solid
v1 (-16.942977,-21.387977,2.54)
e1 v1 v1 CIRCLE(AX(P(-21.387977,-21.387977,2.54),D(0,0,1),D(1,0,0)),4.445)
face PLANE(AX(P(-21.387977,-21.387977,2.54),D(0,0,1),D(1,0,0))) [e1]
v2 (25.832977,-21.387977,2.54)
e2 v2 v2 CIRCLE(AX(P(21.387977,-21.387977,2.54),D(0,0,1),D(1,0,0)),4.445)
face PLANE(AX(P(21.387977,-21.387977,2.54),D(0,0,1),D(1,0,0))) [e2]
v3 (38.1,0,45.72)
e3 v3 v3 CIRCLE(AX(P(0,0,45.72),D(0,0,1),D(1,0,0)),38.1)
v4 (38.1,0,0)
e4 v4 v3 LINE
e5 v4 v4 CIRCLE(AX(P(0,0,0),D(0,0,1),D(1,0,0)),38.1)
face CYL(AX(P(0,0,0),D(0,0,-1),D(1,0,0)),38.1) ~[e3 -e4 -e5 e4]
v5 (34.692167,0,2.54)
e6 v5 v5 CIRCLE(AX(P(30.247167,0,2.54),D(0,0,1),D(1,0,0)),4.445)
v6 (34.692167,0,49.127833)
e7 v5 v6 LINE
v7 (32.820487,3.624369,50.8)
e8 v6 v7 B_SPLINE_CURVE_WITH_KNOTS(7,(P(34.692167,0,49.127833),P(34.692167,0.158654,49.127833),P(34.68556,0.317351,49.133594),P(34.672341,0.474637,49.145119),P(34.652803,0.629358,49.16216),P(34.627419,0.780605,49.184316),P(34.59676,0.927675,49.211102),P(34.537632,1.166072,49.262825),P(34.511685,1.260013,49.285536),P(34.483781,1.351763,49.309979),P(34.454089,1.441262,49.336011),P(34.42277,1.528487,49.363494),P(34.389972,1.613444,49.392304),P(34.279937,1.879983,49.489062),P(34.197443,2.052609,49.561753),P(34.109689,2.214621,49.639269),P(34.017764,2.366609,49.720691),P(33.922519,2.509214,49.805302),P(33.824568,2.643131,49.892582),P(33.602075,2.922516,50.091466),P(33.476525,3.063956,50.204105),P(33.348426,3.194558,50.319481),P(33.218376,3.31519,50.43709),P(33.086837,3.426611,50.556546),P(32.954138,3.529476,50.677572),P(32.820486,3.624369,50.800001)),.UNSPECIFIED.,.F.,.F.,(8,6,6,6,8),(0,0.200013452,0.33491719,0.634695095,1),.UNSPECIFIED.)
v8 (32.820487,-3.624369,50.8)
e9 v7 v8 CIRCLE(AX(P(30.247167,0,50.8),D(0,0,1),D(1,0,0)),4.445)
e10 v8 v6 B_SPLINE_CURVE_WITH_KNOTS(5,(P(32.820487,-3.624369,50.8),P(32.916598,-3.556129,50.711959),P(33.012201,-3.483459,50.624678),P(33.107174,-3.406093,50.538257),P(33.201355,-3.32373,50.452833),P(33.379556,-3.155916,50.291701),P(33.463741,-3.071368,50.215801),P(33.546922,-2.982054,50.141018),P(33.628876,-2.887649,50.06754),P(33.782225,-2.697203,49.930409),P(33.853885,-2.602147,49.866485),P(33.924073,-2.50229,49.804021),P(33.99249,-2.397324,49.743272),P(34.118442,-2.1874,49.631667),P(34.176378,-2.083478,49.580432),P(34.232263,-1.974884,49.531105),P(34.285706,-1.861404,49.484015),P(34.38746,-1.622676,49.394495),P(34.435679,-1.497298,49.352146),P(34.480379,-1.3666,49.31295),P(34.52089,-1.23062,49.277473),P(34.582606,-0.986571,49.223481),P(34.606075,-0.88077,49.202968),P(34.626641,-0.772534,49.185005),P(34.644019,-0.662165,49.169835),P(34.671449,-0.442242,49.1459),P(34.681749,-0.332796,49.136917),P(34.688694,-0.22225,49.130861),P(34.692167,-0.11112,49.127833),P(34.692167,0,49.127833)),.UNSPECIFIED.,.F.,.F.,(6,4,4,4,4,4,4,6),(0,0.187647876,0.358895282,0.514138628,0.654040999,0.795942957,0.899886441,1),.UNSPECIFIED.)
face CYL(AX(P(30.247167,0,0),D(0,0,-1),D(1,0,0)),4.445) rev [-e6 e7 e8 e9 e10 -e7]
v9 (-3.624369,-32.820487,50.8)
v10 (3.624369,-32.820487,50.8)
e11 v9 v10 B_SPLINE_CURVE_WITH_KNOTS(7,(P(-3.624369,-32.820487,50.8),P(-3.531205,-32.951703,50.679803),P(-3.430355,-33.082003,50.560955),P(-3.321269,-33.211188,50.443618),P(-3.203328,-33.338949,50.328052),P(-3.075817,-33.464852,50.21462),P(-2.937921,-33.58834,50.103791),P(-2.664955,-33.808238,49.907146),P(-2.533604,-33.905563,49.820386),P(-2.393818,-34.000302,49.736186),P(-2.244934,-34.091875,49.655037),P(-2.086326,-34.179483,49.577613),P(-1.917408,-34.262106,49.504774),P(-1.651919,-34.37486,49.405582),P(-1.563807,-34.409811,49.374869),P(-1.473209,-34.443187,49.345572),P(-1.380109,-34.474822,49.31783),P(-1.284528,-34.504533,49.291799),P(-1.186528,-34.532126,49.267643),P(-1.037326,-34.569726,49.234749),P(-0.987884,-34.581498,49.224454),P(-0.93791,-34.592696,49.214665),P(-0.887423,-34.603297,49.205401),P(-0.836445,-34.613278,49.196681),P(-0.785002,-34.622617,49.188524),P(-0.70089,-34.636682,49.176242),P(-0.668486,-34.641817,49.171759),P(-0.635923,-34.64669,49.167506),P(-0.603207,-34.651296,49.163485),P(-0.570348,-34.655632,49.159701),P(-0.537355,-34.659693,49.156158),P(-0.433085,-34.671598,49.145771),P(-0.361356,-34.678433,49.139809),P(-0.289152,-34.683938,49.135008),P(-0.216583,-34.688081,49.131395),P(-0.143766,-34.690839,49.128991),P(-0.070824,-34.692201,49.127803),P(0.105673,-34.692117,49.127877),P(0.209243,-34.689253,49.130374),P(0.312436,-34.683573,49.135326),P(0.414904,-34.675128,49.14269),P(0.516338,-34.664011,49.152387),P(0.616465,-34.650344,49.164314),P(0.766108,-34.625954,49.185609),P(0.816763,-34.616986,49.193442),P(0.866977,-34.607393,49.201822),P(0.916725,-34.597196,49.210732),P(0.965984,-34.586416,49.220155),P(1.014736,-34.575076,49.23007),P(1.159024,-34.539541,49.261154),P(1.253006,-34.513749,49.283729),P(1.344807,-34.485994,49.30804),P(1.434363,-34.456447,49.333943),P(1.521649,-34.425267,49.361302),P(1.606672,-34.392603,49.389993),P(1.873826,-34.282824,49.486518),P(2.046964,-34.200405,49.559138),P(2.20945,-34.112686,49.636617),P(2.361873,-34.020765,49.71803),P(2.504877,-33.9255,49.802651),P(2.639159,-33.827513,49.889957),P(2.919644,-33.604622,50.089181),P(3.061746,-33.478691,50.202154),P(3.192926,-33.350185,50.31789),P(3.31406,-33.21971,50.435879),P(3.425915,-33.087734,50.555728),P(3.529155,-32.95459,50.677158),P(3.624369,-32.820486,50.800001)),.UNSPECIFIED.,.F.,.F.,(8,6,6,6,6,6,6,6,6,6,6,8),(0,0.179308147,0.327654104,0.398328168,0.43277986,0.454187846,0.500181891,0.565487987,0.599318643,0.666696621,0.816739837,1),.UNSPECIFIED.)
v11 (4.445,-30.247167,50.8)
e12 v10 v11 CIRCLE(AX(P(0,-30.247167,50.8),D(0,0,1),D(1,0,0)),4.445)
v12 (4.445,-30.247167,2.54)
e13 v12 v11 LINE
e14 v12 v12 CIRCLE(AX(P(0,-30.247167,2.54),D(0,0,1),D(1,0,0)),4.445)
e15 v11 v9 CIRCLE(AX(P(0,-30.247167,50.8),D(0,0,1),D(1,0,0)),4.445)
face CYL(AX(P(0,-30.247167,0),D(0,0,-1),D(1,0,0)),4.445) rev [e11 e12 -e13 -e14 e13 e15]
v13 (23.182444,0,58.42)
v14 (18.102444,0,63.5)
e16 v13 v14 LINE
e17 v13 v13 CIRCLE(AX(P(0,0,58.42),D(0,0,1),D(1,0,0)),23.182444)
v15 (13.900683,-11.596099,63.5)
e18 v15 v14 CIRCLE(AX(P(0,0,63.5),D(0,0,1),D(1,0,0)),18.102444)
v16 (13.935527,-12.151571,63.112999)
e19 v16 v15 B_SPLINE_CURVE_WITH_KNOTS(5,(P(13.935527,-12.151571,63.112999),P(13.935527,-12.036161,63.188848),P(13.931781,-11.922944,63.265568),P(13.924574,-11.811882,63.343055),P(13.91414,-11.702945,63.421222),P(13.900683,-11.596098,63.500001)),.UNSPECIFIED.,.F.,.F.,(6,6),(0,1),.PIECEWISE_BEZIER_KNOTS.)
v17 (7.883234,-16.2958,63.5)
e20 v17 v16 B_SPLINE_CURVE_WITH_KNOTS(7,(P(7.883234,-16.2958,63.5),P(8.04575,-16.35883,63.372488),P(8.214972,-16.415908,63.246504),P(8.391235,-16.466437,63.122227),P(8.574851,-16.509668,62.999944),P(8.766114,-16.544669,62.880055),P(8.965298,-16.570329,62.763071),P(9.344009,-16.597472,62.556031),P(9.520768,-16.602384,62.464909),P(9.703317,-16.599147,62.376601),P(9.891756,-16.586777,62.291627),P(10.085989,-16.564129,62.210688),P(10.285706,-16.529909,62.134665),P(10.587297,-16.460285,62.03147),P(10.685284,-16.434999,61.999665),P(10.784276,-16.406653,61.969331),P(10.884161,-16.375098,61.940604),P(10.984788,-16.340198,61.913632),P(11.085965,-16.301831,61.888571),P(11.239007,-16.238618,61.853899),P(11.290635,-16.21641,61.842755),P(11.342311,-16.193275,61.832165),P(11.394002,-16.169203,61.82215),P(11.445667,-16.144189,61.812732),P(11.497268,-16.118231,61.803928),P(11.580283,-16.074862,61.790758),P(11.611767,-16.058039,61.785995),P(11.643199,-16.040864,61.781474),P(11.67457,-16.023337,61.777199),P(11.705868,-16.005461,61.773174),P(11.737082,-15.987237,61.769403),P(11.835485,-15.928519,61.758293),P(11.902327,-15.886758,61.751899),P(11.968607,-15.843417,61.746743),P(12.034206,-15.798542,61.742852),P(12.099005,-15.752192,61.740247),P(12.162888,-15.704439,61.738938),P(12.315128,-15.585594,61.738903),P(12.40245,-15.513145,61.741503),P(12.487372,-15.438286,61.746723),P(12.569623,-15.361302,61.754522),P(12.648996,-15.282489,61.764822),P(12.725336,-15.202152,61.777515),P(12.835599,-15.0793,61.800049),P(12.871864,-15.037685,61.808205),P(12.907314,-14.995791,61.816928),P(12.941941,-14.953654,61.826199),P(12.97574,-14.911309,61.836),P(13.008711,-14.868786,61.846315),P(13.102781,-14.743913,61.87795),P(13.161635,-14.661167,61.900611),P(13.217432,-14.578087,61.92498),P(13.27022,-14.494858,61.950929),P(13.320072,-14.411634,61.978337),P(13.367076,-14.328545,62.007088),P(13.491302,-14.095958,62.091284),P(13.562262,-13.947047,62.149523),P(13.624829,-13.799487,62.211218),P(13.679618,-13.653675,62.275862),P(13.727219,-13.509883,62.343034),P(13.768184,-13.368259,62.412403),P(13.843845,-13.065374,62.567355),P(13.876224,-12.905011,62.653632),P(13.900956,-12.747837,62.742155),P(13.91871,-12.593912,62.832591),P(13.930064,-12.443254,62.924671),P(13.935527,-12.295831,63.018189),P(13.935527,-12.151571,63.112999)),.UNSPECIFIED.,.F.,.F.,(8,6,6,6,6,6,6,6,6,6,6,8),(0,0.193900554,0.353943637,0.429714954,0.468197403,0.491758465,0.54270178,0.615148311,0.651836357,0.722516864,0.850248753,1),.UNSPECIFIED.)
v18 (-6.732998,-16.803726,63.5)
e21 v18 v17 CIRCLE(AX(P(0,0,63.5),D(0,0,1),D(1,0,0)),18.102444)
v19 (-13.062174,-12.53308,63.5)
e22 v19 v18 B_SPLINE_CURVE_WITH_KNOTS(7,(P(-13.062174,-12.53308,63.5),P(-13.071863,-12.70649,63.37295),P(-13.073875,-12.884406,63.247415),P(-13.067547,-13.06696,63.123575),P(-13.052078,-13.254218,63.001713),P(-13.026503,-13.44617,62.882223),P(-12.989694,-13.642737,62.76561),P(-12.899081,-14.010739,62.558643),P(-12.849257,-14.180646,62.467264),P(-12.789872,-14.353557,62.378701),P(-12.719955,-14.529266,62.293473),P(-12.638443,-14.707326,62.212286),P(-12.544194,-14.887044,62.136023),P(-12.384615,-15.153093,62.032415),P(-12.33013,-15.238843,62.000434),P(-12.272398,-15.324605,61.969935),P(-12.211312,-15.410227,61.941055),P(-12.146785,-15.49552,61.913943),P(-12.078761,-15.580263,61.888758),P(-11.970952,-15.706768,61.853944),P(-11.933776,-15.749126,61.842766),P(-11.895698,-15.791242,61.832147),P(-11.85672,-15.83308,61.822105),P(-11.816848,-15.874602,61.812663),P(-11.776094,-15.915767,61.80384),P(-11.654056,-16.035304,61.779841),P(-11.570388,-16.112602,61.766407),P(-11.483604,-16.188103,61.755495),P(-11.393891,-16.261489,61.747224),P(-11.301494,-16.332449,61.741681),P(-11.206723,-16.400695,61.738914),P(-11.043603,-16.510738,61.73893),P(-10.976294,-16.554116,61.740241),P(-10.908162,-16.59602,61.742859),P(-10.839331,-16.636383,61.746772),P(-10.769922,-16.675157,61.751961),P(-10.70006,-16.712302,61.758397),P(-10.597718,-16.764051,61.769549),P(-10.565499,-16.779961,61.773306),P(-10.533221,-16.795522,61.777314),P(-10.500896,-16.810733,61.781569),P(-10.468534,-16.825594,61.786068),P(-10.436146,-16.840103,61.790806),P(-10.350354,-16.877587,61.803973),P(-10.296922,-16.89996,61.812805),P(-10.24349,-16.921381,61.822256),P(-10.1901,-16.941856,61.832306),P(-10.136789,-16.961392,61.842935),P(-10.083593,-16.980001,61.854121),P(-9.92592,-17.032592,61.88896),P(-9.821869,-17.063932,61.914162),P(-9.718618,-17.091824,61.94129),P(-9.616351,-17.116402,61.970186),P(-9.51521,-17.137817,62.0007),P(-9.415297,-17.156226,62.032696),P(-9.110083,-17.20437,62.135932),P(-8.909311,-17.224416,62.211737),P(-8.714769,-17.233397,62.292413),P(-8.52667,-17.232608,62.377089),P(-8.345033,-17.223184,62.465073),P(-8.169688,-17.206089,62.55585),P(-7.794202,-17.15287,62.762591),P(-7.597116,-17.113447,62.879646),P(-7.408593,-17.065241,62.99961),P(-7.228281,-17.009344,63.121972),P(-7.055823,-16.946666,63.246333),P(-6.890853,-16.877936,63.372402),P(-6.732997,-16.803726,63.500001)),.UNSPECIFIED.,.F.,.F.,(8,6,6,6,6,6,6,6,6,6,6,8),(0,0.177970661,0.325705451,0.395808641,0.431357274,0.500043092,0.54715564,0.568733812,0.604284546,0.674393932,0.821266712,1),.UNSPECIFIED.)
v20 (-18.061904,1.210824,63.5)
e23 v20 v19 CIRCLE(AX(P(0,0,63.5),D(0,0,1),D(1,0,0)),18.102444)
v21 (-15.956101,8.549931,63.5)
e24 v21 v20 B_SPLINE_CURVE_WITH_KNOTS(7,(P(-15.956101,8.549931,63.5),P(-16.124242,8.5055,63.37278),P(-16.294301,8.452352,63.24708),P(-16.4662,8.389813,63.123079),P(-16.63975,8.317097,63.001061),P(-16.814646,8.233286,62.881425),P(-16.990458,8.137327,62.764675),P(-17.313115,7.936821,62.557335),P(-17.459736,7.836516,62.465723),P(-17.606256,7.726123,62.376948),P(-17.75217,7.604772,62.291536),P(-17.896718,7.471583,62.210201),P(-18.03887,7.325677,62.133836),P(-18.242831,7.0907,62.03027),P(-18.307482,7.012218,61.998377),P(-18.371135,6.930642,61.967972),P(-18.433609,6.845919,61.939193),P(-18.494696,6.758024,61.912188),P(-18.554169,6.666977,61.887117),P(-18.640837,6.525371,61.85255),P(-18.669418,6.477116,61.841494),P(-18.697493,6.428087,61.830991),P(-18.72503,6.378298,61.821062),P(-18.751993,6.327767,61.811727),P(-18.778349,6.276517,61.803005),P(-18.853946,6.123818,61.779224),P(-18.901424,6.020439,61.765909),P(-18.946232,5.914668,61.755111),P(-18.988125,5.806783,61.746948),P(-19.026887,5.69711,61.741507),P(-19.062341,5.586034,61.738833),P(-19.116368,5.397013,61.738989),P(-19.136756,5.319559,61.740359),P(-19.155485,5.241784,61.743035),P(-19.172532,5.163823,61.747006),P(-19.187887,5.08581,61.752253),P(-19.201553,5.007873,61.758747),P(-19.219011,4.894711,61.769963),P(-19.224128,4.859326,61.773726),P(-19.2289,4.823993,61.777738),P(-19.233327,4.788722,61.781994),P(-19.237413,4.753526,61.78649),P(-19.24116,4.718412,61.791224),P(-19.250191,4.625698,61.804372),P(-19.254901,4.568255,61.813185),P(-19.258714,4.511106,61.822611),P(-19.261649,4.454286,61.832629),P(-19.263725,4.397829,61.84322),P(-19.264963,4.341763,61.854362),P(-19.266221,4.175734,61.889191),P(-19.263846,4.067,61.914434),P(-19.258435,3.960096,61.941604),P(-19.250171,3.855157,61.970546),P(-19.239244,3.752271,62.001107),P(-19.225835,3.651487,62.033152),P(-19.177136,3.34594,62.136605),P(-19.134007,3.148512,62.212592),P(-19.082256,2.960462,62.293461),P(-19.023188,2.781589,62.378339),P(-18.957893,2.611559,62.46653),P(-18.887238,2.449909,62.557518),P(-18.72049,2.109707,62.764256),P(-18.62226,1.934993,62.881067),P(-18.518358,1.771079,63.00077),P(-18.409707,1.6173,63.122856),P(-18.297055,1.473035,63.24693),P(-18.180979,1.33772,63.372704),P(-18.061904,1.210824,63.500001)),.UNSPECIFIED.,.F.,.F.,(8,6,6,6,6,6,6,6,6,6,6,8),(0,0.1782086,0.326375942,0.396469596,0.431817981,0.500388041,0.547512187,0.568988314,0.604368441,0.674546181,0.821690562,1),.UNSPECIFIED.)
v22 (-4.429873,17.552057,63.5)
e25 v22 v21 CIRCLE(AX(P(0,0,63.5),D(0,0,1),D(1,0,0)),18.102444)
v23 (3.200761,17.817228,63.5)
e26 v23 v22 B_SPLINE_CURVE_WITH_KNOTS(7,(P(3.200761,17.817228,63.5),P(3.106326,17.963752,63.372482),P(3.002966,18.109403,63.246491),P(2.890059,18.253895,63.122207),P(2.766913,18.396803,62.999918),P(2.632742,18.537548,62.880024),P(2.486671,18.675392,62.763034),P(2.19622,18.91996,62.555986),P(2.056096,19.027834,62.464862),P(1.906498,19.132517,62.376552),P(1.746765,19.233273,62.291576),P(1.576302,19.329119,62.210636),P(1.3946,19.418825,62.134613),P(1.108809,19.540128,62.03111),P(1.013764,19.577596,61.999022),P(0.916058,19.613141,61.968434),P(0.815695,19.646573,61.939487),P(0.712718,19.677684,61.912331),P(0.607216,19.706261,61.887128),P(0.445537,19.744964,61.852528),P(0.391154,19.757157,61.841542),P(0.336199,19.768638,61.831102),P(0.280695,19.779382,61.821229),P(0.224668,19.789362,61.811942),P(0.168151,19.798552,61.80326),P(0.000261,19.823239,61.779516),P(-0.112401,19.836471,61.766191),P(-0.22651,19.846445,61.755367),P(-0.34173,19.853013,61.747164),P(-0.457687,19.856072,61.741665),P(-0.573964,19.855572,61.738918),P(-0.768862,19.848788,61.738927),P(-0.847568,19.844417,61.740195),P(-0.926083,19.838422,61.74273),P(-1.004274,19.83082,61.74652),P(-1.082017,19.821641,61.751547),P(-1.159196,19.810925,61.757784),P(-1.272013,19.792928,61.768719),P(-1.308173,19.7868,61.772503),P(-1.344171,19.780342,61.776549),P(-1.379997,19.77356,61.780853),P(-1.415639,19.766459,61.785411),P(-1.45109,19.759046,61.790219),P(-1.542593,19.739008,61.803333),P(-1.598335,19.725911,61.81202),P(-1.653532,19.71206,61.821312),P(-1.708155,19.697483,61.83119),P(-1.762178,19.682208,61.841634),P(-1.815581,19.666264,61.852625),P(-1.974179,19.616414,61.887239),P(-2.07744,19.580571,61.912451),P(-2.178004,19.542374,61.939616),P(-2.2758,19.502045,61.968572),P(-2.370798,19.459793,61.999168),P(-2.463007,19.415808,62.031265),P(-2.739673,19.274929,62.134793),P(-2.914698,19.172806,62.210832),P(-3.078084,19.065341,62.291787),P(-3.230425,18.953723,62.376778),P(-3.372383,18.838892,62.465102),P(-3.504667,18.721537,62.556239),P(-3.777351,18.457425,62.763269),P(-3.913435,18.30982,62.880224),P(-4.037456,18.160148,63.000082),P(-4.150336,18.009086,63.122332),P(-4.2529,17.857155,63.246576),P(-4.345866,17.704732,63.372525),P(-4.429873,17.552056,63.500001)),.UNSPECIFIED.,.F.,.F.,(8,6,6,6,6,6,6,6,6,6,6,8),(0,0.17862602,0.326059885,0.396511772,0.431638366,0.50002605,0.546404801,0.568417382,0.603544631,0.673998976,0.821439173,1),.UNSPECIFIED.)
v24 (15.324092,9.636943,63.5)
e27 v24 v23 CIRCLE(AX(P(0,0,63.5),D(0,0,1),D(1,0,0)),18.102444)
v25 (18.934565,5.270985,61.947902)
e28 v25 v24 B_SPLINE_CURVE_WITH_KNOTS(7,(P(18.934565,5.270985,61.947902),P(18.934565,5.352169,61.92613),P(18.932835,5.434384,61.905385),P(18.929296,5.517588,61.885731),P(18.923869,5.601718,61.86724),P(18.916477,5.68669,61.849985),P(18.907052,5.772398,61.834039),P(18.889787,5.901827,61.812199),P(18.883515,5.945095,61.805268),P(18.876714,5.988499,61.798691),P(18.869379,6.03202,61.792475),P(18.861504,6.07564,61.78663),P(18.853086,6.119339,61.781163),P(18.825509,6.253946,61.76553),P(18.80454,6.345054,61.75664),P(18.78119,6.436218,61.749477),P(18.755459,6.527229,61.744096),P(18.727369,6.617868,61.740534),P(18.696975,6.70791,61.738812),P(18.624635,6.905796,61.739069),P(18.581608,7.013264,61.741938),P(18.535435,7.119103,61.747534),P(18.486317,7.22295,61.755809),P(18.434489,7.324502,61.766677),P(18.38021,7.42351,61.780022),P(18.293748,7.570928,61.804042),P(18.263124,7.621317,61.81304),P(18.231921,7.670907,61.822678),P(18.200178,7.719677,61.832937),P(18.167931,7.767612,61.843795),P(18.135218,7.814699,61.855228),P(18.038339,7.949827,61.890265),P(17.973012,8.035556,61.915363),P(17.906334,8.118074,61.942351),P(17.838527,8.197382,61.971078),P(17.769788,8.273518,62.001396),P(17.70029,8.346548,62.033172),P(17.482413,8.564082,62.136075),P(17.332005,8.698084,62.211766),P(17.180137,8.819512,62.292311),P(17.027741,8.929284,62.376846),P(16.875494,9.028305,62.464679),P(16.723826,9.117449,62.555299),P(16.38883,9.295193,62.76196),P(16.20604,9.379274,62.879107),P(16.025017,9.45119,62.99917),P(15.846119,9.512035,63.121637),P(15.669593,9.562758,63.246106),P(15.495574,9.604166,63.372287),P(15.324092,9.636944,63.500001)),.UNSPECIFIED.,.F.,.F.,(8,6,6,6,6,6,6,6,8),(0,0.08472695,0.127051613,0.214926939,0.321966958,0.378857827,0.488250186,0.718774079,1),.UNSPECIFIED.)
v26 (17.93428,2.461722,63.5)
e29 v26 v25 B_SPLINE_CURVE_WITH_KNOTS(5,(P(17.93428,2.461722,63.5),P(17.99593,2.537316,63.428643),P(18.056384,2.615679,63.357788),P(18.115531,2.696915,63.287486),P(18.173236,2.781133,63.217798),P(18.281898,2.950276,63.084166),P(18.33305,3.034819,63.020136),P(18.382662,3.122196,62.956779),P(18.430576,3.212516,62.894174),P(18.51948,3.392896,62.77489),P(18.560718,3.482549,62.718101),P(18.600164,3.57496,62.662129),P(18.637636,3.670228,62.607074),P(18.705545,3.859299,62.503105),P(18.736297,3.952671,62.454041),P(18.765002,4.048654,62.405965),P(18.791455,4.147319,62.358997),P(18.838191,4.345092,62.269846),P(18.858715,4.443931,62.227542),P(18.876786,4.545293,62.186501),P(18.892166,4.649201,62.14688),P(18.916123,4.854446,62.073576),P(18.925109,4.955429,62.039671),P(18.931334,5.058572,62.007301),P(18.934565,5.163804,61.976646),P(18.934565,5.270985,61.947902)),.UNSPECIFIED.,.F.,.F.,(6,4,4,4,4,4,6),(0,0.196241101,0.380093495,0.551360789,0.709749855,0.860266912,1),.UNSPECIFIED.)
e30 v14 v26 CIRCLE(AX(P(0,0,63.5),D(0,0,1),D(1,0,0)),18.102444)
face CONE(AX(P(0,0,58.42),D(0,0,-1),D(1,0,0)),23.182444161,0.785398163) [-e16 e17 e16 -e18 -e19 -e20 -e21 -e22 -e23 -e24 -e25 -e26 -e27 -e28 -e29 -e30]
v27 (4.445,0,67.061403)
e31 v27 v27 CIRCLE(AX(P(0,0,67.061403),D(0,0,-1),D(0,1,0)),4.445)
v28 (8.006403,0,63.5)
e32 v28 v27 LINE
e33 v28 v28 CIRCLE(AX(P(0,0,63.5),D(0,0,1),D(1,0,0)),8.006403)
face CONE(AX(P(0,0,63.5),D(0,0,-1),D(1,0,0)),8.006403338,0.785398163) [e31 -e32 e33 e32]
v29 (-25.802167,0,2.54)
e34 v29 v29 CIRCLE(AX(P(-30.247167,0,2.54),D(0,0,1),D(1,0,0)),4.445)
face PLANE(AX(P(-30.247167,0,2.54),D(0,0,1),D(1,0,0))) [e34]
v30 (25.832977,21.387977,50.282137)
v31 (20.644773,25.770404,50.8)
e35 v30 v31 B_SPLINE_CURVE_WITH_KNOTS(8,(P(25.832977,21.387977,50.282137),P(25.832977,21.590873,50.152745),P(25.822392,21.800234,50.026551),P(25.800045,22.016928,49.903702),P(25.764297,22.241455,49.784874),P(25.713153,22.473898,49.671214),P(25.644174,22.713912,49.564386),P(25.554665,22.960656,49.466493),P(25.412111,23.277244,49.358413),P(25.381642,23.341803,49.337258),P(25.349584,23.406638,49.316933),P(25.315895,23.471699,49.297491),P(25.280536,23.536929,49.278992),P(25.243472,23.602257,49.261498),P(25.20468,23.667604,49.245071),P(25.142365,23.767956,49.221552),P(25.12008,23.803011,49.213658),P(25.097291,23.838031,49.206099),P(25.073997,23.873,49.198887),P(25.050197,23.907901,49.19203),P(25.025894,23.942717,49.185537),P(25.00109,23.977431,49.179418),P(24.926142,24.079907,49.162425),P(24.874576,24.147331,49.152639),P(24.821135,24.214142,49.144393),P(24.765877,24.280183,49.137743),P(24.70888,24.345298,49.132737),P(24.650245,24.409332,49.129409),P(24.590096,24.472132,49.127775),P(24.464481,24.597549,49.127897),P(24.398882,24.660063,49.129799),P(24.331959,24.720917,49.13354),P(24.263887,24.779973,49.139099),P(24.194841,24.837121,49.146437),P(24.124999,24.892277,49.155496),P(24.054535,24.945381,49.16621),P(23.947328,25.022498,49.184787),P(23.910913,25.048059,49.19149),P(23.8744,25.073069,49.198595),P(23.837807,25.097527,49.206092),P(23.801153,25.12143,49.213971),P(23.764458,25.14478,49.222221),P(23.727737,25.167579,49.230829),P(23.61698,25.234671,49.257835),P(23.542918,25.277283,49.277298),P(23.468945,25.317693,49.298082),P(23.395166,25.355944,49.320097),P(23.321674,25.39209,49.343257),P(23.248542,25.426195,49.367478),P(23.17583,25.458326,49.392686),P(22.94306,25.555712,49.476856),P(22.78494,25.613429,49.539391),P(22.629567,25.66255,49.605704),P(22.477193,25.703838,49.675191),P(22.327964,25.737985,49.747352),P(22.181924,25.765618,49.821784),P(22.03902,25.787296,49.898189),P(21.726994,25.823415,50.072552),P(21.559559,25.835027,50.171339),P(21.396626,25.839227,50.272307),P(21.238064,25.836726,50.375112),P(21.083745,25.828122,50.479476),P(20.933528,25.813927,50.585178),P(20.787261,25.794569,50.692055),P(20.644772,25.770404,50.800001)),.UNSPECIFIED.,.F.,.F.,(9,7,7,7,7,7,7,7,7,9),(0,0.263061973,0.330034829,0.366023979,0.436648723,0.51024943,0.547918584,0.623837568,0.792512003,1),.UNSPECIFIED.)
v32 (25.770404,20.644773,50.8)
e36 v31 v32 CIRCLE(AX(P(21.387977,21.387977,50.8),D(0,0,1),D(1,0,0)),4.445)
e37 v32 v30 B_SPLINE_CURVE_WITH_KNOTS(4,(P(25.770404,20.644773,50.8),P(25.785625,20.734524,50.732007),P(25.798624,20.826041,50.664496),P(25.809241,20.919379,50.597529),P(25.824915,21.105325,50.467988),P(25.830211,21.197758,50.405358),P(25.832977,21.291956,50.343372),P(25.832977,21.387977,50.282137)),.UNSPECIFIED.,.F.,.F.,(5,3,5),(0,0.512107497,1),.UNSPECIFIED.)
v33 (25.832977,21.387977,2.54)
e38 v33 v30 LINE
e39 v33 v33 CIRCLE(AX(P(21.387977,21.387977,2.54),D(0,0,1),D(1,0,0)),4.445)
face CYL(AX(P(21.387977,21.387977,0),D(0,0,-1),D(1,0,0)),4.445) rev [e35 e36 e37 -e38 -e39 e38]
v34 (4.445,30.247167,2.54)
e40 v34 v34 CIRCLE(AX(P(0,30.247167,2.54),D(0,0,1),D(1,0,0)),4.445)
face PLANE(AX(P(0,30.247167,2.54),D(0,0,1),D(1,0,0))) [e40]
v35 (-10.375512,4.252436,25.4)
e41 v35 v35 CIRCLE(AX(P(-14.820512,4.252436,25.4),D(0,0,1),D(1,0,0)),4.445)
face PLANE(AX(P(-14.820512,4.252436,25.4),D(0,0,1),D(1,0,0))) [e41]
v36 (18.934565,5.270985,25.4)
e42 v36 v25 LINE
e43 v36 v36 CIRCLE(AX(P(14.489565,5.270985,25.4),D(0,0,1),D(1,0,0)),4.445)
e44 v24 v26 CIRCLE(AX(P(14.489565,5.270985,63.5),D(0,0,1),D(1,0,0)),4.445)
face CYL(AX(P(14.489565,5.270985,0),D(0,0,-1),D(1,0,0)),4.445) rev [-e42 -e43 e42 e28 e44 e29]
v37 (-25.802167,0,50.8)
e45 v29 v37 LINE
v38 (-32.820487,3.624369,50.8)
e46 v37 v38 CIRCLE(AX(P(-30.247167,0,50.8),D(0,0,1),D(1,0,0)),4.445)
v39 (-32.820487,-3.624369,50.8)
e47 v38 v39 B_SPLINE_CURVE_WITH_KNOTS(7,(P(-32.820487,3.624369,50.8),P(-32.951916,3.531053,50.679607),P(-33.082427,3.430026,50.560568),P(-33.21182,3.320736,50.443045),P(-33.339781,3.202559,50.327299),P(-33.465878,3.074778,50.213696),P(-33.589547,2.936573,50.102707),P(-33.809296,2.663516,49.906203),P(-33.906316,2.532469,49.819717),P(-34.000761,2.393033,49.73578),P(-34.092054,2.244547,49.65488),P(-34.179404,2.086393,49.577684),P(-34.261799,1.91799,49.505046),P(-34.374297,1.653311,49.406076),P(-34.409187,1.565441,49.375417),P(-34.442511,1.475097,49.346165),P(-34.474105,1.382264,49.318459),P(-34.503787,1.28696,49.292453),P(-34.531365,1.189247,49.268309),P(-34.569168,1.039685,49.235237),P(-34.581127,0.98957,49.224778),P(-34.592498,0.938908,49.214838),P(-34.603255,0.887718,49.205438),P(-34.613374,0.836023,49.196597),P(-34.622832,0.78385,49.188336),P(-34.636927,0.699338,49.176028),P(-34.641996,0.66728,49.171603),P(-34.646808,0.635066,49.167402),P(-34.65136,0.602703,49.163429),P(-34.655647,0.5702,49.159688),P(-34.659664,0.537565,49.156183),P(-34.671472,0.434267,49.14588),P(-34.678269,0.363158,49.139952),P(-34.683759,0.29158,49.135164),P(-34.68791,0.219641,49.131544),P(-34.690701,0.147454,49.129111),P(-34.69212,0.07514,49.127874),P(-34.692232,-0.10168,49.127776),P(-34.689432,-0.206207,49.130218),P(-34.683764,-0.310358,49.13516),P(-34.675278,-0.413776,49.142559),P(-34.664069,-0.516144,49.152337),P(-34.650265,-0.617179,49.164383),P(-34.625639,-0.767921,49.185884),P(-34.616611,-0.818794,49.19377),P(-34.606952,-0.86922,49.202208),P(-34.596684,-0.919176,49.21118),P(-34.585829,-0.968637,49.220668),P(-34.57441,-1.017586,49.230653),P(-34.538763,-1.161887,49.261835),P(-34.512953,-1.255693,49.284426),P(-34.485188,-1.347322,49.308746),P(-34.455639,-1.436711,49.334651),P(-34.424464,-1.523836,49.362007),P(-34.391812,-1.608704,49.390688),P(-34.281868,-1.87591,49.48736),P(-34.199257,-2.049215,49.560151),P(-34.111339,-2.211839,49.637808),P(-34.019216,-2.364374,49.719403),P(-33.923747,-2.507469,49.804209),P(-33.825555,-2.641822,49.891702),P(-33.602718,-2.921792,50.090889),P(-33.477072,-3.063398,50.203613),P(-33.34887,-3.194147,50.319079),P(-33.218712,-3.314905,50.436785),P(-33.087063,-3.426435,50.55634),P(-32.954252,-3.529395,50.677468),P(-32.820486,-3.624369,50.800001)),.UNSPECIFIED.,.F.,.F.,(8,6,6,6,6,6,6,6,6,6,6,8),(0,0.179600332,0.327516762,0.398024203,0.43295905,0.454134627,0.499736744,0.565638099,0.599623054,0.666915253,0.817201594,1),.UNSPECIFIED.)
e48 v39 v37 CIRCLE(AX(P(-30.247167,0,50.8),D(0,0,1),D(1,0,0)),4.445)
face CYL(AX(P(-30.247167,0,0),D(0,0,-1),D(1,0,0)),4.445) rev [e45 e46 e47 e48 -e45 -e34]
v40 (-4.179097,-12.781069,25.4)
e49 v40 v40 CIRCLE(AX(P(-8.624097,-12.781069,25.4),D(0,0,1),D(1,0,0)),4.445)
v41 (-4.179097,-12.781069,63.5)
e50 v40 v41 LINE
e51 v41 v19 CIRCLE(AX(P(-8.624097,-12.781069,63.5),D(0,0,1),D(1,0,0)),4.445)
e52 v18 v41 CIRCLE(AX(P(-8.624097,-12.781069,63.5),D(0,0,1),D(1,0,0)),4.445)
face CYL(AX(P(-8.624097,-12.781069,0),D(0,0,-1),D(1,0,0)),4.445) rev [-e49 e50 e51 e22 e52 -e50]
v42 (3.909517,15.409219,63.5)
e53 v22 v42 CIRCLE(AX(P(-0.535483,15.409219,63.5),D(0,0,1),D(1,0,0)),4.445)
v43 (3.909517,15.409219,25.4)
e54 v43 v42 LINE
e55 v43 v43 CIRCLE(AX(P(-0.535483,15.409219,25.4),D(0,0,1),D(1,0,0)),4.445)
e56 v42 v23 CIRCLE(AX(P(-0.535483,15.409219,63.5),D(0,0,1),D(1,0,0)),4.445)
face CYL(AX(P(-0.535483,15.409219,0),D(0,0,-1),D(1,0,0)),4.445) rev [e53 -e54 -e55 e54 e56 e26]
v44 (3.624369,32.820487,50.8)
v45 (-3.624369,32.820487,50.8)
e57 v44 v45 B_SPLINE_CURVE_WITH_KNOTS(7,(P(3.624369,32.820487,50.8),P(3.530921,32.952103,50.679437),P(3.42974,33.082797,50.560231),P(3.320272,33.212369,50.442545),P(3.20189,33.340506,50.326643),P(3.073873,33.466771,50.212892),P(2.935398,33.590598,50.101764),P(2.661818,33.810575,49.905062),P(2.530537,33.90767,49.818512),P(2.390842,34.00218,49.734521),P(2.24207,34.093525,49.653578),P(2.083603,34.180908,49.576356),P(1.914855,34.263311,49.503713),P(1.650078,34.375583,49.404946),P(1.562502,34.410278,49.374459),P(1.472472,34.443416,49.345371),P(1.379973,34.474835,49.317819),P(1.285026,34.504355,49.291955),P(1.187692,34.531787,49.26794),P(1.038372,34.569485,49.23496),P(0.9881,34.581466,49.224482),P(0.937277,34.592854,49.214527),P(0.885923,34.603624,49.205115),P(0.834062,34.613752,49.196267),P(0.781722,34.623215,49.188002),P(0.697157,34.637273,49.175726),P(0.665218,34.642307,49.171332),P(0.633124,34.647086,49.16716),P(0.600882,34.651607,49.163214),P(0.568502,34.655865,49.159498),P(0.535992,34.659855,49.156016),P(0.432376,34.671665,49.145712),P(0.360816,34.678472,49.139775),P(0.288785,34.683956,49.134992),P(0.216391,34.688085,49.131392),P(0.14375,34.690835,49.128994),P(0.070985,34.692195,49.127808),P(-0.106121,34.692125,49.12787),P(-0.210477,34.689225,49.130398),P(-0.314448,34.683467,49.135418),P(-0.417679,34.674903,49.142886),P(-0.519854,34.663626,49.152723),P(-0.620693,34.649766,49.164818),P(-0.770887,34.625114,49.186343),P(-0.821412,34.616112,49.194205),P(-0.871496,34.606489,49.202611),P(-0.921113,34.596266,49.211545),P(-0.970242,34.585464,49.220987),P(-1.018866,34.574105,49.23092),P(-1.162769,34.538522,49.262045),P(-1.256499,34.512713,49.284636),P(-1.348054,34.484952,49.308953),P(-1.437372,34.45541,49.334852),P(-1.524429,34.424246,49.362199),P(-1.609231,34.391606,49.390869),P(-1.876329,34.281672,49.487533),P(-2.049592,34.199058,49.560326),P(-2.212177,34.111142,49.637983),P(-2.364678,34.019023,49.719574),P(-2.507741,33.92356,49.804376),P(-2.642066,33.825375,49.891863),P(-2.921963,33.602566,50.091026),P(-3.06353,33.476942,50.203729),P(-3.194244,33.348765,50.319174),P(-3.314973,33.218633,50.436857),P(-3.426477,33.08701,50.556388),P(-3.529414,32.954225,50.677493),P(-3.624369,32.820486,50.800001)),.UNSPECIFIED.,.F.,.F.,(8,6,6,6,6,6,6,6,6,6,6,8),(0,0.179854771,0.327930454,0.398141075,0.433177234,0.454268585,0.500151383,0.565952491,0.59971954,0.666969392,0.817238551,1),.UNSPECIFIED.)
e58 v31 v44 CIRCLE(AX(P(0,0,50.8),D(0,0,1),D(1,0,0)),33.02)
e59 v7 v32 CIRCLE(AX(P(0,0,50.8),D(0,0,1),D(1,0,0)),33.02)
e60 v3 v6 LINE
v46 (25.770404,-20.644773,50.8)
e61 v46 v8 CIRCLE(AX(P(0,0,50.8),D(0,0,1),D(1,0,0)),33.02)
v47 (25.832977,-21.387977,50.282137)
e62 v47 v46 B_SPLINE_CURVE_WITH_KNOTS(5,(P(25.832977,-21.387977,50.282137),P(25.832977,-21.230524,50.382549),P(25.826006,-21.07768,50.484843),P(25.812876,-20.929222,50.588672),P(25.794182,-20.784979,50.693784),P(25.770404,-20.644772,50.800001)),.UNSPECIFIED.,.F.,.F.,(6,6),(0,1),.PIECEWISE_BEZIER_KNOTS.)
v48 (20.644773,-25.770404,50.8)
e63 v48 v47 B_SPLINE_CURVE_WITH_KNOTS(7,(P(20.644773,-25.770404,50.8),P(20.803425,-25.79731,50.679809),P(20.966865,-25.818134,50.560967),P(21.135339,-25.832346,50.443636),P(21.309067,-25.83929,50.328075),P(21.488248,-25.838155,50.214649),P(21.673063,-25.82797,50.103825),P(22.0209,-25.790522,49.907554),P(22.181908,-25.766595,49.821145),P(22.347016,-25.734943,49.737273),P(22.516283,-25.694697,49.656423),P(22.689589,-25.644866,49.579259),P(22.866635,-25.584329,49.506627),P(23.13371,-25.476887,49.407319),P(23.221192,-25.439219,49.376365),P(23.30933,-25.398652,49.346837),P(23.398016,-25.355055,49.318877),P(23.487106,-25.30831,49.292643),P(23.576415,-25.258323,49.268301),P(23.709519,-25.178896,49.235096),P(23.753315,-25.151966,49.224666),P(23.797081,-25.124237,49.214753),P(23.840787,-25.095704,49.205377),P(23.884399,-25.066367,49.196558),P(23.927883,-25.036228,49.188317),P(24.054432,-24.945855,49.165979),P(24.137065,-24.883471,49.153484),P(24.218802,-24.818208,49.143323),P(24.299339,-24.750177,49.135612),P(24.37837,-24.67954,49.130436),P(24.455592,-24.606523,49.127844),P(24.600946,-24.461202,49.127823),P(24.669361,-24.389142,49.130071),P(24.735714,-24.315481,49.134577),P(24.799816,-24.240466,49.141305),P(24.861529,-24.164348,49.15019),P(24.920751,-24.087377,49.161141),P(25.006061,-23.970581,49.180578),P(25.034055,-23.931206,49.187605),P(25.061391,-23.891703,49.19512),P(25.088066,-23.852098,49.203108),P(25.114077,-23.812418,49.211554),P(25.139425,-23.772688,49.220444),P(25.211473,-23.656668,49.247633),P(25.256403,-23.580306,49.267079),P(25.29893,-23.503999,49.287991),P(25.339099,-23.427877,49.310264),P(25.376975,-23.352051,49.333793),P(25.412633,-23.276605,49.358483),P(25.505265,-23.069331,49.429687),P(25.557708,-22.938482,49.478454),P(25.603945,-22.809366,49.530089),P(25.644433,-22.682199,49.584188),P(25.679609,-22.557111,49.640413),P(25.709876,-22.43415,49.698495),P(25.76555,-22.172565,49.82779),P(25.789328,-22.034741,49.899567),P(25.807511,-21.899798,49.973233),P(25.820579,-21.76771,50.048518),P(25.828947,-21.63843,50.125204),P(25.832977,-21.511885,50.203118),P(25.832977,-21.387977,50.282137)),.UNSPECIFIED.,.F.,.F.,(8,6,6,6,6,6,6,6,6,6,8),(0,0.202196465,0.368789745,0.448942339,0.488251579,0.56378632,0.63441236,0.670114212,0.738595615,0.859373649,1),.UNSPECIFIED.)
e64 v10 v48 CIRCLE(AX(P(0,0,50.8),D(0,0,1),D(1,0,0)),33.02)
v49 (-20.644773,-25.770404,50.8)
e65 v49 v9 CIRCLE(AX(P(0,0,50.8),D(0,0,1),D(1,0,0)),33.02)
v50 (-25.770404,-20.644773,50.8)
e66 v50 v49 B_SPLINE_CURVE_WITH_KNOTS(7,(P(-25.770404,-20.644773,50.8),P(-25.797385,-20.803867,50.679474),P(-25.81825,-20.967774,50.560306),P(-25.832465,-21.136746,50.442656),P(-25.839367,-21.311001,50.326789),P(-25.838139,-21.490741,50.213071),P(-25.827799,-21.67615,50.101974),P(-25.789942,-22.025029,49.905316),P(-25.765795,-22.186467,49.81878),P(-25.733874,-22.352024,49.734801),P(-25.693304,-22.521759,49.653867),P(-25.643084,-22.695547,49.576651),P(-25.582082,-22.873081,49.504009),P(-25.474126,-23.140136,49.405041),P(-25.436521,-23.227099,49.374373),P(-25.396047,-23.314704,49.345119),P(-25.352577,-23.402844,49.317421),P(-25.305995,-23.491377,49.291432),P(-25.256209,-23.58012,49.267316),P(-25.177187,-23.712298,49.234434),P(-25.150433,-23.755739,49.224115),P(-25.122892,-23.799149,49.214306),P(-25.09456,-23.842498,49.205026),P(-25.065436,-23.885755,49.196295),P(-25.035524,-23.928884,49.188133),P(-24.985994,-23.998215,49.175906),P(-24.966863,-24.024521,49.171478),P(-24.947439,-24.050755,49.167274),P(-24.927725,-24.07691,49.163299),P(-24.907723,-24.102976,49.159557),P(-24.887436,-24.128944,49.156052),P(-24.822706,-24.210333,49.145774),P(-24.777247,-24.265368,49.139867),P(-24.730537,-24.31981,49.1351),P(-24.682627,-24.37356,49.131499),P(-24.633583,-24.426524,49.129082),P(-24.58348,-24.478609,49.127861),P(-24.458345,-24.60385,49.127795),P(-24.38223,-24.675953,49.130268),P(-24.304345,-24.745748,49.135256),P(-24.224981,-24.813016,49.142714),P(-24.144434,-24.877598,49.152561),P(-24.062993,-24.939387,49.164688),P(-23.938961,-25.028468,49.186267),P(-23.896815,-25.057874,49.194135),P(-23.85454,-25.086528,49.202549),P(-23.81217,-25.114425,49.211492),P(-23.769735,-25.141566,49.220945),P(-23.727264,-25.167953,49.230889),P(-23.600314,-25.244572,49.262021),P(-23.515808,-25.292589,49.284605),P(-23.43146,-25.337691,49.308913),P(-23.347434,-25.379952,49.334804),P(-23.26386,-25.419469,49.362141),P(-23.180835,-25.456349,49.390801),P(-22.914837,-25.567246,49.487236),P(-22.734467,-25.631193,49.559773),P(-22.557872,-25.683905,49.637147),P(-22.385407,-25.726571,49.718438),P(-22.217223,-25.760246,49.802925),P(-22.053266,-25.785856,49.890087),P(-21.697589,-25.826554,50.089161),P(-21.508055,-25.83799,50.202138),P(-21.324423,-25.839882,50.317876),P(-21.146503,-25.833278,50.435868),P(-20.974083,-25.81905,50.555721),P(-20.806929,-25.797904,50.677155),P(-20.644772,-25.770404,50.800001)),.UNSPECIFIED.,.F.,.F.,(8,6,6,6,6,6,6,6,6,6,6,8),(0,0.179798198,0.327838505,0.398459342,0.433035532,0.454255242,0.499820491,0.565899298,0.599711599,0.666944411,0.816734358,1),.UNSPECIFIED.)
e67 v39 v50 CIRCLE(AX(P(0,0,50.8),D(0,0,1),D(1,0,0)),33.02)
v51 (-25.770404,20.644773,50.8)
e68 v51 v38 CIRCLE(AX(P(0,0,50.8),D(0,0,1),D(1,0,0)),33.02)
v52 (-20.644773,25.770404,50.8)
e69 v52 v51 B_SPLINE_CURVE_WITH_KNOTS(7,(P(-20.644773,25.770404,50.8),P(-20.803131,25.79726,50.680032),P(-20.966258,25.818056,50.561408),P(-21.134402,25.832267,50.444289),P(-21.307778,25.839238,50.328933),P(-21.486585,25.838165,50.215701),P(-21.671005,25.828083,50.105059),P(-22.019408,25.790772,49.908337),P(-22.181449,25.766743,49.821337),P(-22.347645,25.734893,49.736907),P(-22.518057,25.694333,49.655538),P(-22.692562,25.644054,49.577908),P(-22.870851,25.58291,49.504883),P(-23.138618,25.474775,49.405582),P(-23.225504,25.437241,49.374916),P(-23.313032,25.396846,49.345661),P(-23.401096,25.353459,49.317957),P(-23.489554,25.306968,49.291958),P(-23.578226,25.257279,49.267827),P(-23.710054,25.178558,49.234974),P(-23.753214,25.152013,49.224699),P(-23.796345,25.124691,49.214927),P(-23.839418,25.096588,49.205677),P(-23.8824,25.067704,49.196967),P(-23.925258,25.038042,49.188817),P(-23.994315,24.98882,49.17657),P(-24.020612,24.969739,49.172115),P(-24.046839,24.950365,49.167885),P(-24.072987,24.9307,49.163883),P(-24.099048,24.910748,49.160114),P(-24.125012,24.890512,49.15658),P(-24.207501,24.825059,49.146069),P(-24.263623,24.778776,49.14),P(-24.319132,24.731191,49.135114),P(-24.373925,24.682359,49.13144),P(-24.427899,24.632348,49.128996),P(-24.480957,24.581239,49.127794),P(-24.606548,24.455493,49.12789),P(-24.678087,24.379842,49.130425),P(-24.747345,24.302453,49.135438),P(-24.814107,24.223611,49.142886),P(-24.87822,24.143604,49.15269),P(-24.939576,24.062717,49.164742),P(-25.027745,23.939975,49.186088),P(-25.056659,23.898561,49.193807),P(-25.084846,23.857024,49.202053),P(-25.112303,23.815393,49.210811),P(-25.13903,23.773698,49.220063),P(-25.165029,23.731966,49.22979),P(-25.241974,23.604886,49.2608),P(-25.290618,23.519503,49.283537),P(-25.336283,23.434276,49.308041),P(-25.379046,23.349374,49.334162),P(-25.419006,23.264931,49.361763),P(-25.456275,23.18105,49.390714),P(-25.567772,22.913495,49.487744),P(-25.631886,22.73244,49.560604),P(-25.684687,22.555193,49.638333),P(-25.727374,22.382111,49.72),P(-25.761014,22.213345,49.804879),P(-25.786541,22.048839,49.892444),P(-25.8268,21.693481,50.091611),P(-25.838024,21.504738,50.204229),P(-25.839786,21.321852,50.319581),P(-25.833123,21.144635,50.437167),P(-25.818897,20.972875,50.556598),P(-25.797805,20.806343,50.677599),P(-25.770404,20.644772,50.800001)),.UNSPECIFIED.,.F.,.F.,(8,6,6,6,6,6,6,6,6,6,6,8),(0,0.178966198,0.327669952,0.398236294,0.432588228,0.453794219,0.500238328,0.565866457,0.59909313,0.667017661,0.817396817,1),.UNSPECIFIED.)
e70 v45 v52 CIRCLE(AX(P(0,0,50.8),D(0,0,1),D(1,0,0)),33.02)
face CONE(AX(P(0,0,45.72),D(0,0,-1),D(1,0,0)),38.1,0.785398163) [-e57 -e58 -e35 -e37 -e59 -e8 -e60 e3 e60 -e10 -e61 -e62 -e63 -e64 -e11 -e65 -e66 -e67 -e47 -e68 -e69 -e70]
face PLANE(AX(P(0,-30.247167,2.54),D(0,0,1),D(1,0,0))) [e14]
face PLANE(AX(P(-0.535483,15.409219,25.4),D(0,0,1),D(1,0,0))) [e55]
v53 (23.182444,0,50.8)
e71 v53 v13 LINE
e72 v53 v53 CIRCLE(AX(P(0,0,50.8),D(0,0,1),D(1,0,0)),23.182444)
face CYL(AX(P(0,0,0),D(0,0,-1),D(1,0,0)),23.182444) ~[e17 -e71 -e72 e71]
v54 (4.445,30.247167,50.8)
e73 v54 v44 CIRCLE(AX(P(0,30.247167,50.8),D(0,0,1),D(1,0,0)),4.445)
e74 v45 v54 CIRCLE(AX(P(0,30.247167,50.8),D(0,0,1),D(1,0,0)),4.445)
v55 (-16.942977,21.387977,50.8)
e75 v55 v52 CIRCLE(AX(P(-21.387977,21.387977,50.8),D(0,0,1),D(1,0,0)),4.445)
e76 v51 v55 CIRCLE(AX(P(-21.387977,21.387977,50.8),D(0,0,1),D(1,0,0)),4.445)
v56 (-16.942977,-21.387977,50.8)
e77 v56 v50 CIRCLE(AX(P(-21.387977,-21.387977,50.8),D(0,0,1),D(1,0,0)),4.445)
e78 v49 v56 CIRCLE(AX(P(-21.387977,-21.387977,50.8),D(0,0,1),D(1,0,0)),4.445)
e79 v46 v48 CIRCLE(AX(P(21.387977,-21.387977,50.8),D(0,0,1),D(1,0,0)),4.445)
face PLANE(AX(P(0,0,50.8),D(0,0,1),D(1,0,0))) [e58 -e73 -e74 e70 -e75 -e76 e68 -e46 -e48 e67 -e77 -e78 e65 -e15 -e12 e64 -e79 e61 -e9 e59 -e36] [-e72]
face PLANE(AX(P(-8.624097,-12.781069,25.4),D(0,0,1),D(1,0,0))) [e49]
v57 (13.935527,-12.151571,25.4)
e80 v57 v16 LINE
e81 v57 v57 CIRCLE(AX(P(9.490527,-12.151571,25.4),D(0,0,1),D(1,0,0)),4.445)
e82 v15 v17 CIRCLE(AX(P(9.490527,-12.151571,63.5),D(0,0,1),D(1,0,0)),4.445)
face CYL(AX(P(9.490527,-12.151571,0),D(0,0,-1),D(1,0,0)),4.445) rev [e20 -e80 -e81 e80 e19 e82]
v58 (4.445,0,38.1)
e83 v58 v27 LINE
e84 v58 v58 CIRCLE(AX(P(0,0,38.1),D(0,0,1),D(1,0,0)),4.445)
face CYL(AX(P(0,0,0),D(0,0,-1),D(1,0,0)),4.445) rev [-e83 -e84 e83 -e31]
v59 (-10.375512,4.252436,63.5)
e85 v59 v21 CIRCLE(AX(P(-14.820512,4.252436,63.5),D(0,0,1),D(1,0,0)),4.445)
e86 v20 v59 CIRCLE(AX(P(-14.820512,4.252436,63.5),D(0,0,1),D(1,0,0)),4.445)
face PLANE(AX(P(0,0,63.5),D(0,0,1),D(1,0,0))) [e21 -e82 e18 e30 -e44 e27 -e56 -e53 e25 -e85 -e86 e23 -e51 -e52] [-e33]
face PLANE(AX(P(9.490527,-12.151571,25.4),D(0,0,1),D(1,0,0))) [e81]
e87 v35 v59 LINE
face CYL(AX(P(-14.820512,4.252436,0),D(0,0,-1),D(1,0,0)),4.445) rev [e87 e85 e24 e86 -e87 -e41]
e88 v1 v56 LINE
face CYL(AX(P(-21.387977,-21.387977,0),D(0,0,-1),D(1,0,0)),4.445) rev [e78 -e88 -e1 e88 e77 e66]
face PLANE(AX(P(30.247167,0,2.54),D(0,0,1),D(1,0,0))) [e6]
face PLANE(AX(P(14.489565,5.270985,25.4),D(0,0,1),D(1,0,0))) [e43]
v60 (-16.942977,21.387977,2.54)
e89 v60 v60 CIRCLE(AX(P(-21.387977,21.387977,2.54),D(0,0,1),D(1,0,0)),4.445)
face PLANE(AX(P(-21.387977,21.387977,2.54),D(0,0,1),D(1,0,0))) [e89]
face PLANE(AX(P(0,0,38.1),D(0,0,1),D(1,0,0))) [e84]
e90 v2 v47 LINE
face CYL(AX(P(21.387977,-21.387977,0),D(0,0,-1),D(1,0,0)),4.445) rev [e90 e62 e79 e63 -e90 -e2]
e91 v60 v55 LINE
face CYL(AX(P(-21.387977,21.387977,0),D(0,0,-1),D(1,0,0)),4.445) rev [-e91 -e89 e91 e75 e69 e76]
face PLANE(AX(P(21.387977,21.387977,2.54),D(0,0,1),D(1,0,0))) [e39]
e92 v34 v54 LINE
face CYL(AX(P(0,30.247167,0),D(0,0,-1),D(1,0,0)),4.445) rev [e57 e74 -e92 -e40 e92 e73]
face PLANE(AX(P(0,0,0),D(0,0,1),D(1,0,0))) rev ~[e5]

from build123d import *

# Parameters (mm, degrees)
F0_R     = 38.1
F0_R_2   = 4.445
F0_R_3   = 23.1824441608
F1_DEPTH = 50.8
F0_R_4   = 8.0064033383
F2_DEPTH = 63.5
F3_DEPTH = 68.58
F4_DEPTH = 2.54
F5_DEPTH = 25.4
F6_DEPTH = 38.1


# Not quite as in the source:
# - a fillet or chamfer that OpenCascade refuses, or shapes differently, is made with other operations: its cross-section is extruded or revolved along the edge and cut away or added


with BuildPart() as f1:
    # F0 (on Top) → F1 (new body)
    with BuildSketch(Plane.XY):
        Circle(F0_R)
        with Locations((-21.3879767226, -21.3879767226)):
            Circle(F0_R_2, mode=Mode.SUBTRACT)
        with Locations((0, -30.2471667528)):
            Circle(F0_R_2, mode=Mode.SUBTRACT)
        with Locations((21.3879767226, -21.3879767226)):
            Circle(F0_R_2, mode=Mode.SUBTRACT)
        with Locations((-30.2471667528, 0)):
            Circle(F0_R_2, mode=Mode.SUBTRACT)
        with Locations((-21.3879767226, 21.3879767226)):
            Circle(F0_R_2, mode=Mode.SUBTRACT)
        Circle(F0_R_3, mode=Mode.SUBTRACT)
        with Locations((30.2471667528, 0)):
            Circle(F0_R_2, mode=Mode.SUBTRACT)
        with Locations((0, 30.2471667528)):
            Circle(F0_R_2, mode=Mode.SUBTRACT)
        with Locations((21.3879767226, 21.3879767226)):
            Circle(F0_R_2, mode=Mode.SUBTRACT)
    extrude(amount=F1_DEPTH)

    # F0 (on Top) → F2 (join)
    with BuildSketch(Plane.XY):
        Circle(F0_R_3)
        with Locations((-8.6240968668, -12.7810694279)):
            Circle(F0_R_2, mode=Mode.SUBTRACT)
        with Locations((9.4905268716, -12.1515711819)):
            Circle(F0_R_2, mode=Mode.SUBTRACT)
        with Locations((-14.8205118576, 4.2524358628)):
            Circle(F0_R_2, mode=Mode.SUBTRACT)
        with Locations((-0.5354831918, 15.4092193261)):
            Circle(F0_R_2, mode=Mode.SUBTRACT)
        Circle(F0_R_4, mode=Mode.SUBTRACT)
        with Locations((14.4895650446, 5.2709854208)):
            Circle(F0_R_2, mode=Mode.SUBTRACT)
    extrude(amount=F2_DEPTH)

    # F0 (on Top) → F3 (join)
    with BuildSketch(Plane.XY):
        Circle(F0_R_4)
        Circle(F0_R_2, mode=Mode.SUBTRACT)
    extrude(amount=F3_DEPTH)

    # F0 (on Top) → F4 (join)
    with BuildSketch(Plane.XY):
        with Locations((-30.2471667528, 0)):
            Circle(F0_R_2)
        with Locations((-21.3879767226, -21.3879767226)):
            Circle(F0_R_2)
        with Locations((0, -30.2471667528)):
            Circle(F0_R_2)
        with Locations((21.3879767226, -21.3879767226)):
            Circle(F0_R_2)
        with Locations((21.3879767226, 21.3879767226)):
            Circle(F0_R_2)
        with Locations((0, 30.2471667528)):
            Circle(F0_R_2)
        with Locations((-21.3879767226, 21.3879767226)):
            Circle(F0_R_2)
        with Locations((30.2471667528, 0)):
            Circle(F0_R_2)
    extrude(amount=F4_DEPTH)

    # F0 (on Top) → F5 (join)
    with BuildSketch(Plane.XY):
        with Locations((-8.6240968668, -12.7810694279)):
            Circle(F0_R_2)
        with Locations((9.4905268716, -12.1515711819)):
            Circle(F0_R_2)
        with Locations((14.4895650446, 5.2709854208)):
            Circle(F0_R_2)
        with Locations((-0.5354831918, 15.4092193261)):
            Circle(F0_R_2)
        with Locations((-14.8205118576, 4.2524358628)):
            Circle(F0_R_2)
    extrude(amount=F5_DEPTH)

    # F0 (on Top) → F6 (join)
    with BuildSketch(Plane.XY):
        Circle(F0_R_2)
    extrude(amount=F6_DEPTH)

    # F7: chamfer of 5.08 on 3 edges, made by hand

    # F7_s1 → F7_t2 (revolve, cut)
    with BuildSketch(Plane.XZ):
        Polygon((38.1, 45.72), (33.02, 50.8), (38.1, 50.8), align=None)
    revolve(axis=Axis((0, 0, 50.8), (0, 0, 1)), mode=Mode.SUBTRACT)

    # F7_s3 → F7_t4 (revolve, cut)
    with BuildSketch(Plane.XZ):
        Polygon((23.1824441608, 58.42), (18.1024441608, 63.5), (23.1824441608, 63.5), align=None)
    revolve(axis=Axis((0, 0, 63.5), (0, 0, 1)), mode=Mode.SUBTRACT)


with BuildPart() as f7_tool6:
    # F7_s7 → F7_t8 (revolve)
    with BuildSketch(Plane.XZ):
        Polygon((8.0064033383, 63.5), (2.9264033383, 68.58), (8.0064033383, 68.58), align=None)
    revolve(axis=Axis((0, 0, 68.58), (0, 0, 1)))

    split(bisect_by=Plane.XY.offset(63.5), keep=Keep.TOP)


with BuildPart() as f1_1:
    add(f1.part)

    # F7_t5: cut F7_tool6
    add(f7_tool6.part, mode=Mode.SUBTRACT)


solid = f1_1.part
